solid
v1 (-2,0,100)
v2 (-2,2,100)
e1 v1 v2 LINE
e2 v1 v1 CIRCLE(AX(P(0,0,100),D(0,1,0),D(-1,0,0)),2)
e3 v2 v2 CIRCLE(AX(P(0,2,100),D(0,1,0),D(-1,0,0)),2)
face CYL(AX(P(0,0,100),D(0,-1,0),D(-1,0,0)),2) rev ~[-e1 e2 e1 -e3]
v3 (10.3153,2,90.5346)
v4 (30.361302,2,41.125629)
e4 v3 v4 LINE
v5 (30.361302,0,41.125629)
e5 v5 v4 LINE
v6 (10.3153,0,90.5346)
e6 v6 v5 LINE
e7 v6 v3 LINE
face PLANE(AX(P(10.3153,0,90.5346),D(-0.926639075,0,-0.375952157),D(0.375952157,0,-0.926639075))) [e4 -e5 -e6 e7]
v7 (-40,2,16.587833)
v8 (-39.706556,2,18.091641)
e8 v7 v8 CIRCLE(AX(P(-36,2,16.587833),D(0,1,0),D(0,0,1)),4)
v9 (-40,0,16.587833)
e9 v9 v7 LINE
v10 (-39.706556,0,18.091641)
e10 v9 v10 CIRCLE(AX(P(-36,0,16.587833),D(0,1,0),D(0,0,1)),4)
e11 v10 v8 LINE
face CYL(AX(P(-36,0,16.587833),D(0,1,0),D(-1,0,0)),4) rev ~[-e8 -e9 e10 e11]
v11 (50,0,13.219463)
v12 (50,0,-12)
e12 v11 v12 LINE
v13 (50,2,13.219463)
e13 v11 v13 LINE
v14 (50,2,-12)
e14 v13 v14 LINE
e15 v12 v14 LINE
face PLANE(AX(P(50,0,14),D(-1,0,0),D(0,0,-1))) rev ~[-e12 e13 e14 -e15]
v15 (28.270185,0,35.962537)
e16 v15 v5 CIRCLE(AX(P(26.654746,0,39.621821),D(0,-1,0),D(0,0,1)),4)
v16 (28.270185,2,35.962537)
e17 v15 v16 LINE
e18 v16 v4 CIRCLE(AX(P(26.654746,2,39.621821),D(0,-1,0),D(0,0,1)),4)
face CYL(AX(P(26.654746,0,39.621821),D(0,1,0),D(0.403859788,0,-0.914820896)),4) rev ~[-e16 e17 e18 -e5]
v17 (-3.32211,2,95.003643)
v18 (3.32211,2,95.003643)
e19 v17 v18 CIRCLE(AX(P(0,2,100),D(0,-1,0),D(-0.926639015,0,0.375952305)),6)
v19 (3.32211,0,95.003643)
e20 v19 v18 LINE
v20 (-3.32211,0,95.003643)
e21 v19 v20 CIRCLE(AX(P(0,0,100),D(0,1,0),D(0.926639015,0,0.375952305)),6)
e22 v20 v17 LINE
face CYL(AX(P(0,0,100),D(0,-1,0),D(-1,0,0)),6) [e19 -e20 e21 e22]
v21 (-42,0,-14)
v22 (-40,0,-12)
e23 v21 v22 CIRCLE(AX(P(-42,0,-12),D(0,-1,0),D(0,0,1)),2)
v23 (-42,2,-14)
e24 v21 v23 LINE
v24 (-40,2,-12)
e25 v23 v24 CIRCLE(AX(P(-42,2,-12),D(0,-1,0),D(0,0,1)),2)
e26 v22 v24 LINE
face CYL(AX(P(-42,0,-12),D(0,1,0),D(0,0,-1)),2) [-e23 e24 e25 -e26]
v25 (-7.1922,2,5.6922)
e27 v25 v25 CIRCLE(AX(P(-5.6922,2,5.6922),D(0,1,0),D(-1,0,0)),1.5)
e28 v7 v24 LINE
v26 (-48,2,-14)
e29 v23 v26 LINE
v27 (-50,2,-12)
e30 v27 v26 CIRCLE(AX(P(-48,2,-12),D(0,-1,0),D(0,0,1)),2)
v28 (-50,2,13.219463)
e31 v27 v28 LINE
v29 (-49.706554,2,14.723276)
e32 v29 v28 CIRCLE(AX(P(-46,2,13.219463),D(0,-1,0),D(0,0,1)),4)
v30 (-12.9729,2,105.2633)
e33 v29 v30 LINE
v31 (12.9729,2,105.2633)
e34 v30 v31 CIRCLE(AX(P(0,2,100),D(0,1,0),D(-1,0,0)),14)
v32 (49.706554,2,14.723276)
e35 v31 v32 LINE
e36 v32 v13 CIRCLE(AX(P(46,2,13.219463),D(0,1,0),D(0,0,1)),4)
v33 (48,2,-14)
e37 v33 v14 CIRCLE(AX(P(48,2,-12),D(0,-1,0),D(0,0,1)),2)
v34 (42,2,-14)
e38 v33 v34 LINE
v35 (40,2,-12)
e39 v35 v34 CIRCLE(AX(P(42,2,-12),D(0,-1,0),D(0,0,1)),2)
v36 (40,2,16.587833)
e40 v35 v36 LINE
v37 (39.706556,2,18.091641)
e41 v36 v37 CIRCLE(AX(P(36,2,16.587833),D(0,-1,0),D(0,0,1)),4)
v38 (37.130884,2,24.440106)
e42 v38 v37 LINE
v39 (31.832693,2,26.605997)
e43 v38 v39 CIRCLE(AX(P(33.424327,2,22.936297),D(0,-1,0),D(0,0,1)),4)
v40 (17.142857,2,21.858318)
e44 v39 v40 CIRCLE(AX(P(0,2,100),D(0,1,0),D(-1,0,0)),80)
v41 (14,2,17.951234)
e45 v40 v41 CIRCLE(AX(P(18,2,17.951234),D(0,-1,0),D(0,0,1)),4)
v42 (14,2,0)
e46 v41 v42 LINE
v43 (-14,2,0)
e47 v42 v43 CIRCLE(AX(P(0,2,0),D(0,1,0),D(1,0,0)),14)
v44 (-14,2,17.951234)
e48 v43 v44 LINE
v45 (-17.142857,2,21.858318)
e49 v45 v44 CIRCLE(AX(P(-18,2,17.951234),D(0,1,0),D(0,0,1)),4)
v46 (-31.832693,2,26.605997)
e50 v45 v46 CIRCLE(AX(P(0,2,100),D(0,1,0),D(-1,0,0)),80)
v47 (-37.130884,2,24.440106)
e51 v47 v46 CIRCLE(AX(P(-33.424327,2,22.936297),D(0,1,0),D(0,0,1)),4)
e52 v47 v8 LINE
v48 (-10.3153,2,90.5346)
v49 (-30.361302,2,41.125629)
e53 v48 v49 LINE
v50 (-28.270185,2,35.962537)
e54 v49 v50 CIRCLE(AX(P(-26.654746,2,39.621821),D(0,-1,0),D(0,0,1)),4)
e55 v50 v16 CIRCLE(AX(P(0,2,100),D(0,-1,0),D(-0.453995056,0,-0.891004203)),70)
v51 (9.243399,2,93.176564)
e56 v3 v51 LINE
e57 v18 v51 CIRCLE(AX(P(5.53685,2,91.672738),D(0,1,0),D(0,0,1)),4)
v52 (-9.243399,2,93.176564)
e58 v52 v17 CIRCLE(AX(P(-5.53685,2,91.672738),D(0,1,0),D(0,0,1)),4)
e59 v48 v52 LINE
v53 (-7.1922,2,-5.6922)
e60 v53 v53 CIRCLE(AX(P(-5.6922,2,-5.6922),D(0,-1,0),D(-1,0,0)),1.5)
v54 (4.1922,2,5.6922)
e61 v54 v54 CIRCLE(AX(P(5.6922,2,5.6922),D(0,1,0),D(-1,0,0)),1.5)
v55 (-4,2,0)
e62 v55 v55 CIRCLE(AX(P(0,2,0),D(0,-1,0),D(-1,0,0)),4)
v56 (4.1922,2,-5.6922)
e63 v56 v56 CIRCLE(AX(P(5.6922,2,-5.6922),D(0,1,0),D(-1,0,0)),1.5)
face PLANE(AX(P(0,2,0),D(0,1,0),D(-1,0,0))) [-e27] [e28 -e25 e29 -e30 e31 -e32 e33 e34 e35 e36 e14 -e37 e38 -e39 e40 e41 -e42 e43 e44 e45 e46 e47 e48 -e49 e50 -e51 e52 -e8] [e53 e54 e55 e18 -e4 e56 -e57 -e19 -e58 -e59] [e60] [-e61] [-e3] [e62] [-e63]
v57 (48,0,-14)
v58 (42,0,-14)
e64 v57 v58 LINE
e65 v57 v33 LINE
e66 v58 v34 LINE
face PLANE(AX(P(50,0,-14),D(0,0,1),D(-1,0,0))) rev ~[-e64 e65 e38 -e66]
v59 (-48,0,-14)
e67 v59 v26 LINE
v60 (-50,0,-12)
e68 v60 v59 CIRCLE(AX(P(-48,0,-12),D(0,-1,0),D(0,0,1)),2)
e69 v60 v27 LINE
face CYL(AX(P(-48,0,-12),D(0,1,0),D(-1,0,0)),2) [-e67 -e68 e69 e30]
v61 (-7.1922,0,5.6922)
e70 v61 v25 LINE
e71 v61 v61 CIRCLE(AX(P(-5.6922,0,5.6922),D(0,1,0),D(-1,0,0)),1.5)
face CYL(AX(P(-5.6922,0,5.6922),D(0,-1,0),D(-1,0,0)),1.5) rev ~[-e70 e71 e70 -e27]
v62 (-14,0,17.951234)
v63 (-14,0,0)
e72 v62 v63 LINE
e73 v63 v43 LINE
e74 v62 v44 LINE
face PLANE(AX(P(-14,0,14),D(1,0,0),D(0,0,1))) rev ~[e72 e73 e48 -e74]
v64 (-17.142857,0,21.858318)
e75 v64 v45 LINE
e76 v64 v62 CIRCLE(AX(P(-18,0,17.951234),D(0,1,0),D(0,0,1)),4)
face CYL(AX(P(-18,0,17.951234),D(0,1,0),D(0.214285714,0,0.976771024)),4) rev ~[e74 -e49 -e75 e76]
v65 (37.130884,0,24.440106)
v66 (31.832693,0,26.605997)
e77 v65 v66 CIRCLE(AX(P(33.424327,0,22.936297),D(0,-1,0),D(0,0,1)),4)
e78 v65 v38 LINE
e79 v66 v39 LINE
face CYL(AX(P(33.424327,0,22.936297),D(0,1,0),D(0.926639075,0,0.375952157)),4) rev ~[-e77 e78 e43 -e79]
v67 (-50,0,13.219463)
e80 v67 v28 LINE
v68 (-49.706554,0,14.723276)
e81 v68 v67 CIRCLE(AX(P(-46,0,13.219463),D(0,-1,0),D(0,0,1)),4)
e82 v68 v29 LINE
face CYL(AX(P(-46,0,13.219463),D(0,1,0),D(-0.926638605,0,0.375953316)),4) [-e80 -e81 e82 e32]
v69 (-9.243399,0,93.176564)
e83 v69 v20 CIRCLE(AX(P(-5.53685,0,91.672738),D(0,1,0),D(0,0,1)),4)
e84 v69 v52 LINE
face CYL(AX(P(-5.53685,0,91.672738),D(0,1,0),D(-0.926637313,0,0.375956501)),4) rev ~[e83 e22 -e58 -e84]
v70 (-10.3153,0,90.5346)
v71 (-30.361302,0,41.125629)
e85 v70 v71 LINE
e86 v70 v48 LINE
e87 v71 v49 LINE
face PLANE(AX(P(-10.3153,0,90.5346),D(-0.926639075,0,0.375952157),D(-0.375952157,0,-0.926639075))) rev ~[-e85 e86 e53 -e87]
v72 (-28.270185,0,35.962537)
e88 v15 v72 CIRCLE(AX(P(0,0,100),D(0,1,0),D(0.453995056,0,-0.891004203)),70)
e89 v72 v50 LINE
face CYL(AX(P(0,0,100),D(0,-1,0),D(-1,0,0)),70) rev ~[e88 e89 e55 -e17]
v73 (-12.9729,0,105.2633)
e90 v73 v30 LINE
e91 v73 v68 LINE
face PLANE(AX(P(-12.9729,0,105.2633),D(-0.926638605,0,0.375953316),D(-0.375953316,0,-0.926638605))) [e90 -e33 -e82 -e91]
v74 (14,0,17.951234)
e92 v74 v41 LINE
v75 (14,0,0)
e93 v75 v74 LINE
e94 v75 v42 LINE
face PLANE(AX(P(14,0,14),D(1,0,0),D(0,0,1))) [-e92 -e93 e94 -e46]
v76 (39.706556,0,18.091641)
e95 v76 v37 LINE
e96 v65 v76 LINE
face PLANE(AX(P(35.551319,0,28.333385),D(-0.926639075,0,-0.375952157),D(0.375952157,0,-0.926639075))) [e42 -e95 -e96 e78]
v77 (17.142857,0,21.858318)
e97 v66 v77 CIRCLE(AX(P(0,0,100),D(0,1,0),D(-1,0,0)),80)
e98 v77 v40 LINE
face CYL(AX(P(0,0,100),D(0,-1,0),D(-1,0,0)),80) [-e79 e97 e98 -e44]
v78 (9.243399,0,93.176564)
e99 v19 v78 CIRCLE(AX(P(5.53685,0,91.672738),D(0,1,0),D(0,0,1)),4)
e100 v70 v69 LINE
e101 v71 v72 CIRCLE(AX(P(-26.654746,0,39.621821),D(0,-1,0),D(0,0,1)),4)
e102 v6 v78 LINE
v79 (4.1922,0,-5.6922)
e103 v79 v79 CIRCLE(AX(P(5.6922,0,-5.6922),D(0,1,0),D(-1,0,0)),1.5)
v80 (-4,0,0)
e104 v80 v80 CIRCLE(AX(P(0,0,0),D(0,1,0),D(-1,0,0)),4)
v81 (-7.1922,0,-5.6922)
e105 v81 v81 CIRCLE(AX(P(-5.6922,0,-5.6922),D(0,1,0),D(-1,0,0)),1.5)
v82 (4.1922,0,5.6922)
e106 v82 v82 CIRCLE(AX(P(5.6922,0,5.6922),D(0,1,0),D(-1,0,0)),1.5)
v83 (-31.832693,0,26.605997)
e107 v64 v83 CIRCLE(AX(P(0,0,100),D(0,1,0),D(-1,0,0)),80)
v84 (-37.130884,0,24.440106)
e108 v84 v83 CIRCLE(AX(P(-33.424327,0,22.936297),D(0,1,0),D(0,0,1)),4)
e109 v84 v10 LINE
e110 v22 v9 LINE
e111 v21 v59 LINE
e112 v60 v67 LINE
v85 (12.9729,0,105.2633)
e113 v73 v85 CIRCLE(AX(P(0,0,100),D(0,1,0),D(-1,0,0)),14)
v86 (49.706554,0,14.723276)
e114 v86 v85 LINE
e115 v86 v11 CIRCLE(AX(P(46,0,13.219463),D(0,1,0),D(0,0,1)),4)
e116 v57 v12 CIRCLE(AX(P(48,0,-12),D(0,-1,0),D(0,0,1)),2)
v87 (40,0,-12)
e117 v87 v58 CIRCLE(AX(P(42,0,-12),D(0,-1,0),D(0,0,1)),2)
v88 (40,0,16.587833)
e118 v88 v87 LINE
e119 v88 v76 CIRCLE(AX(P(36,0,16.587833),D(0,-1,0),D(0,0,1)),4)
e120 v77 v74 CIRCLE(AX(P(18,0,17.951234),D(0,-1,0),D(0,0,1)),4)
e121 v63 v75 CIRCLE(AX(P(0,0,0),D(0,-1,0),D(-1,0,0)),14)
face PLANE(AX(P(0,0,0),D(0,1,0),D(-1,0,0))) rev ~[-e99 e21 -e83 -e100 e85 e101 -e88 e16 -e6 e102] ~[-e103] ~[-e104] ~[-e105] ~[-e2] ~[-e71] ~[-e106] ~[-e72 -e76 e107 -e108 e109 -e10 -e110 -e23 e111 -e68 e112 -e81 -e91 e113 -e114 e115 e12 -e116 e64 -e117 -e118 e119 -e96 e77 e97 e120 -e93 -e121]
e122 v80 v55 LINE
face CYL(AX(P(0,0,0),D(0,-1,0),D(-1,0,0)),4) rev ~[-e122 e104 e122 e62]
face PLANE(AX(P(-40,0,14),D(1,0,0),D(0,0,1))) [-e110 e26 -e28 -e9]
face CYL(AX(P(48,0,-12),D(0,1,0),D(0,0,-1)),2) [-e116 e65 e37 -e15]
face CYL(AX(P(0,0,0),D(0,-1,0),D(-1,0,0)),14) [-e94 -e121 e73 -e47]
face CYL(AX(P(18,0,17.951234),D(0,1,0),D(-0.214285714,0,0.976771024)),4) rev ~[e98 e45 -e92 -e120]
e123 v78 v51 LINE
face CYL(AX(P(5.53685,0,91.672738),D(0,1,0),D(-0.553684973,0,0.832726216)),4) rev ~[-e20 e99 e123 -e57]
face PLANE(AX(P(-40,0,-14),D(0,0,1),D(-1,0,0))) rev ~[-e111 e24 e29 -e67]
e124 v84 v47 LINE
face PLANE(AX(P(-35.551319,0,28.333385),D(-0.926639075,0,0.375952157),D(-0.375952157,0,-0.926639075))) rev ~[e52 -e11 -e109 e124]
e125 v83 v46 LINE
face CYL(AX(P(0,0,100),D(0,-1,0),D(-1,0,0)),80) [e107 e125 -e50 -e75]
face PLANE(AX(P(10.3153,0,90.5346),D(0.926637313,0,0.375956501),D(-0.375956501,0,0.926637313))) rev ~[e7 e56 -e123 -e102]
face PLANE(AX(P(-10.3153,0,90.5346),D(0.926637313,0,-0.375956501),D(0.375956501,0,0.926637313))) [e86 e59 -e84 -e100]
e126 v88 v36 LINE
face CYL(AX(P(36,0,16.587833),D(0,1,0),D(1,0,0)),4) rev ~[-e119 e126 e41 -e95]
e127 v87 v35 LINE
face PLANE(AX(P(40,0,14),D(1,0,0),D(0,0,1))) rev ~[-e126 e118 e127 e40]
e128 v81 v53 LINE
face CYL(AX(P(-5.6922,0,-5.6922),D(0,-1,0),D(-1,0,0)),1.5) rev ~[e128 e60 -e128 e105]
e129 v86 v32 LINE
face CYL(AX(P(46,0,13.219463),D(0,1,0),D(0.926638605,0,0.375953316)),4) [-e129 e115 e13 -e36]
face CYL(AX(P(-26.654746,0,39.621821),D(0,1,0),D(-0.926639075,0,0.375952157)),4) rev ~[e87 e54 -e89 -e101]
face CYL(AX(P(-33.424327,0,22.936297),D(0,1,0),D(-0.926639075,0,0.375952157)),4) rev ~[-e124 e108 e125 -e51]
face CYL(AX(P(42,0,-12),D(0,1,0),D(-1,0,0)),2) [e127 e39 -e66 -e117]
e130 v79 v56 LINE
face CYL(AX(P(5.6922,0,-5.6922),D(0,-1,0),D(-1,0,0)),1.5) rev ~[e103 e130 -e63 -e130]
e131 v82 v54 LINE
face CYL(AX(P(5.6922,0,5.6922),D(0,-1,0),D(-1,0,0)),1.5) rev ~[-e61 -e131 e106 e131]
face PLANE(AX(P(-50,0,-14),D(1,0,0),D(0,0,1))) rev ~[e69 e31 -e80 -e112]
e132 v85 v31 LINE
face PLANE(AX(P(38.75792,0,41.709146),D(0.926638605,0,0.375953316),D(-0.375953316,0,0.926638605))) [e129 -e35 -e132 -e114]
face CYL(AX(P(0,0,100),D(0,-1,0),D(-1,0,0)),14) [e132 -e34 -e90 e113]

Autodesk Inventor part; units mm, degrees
ref_plane "YZ Plane" through (0, 0, 0) normal (1, 0, 0) x (0, 1, 0)
ref_plane "XZ Plane" through (0, 0, 0) normal (0, 1, 0) x (-1, 0, 0)
ref_plane "XY Plane" through (0, 0, 0) normal (0, 0, 1) x (1, 0, 0)
sketch "Sketch1" plane through (0, 0, 0) normal (0, 1, 0) x (-1, 0, 0)
  line L0 (0, 0) -> (5.6922, -5.6922)
  line L1 (0, 0) -> (8.05, 0) construction
  circle A0 centre (5.6922, -5.6922) radius 1.5
  circle A1 centre (5.6922, 5.6922) radius 1.5
  circle A2 centre (-5.6922, 5.6922) radius 1.5
  circle A3 centre (-5.6922, -5.6922) radius 1.5
  circle A4 centre (0, 100) radius 14
  circle A5 centre (0, 100) radius 2
  line L2 (-50, -14) -> (50, -14)
  line L3 (50, -14) -> (50, 14)
  line L4 (50, 14) -> (-50, 14)
  line L5 (-50, 14) -> (-50, -14)
  line L6 (-50, -14) -> (50, 14) construction
  line L7 (50, -14) -> (-50, 14) construction
  circle A6 centre (0, 0) radius 14
  line L8 (-50, 14) -> (-12.9729, 105.2633)
  line L9 (12.9729, 105.2633) -> (50, 14)
  line L10 (10.3153, 90.5346) -> (41.3666, 14)
  line L11 (-10.3153, 90.5346) -> (-41.3666, 14)
  line L12 (0, 86) -> (0, 14)
  circle A7 centre (0, 100) radius 6
  line L13 (-10.3153, 90.5346) -> (-5.5598, 102.2557)
  line L14 (10.3153, 90.5346) -> (5.5598, 102.2557)
  line L15 (-40, 14) -> (-40, -14)
  line L16 (40, 13) -> (40, -14)
  circle A8 centre (0, 0) radius 4
  circle A9 centre (0, 100) radius 70
  circle A10 centre (0, 100) radius 80
  line L17 (-40, 14) -> (-40, 30.718)
  line L18 (-14, 0) -> (-14, 21.2345)
  line L19 (14, 0) -> (14, 21.2345)
  line L20 (40, 13) -> (40, 30.718)
  line L21 (41.3666, 14) -> (40, 12.0487)
  line L22 (-41.3666, 14) -> (-40, 17.3685)
  point P0 (4, 86.5836)
  point P1 (2.5, 14)
  point P2 (-4, 86.5836)
  point P3 (4, 95.5279)
  point P4 (-4, 95.5279)
  point P5 (4.6667, 30.1557)
  point P6 (-4.6667, 30.1557)
  point P7 (31.7797, 37.6297)
  point P8 (-31.7797, 37.6297)
  point P9 (-42.585, 32.2762)
  point P10 (-14, 14)
  point P11 (14, 14)
  point P12 (42.585, 32.2762)
  point P13 (40, 14)
  point P14 (40, 38.6477)
  point P15 (0, 14)
  point P16 (-40, 38.6477)
  point P17 (-40, 17.3685)
  point P18 (-35.5513, 28.3334)
  point P19 (40, 17.3685)
  point P20 (35.5513, 28.3334)
  dimension "d7" = 28
  dimension "d0" = 8.05
  dimension "d1" = 45
  dimension "d2" = 3
  dimension "d5" = 360
  dimension "d9" = 4
  dimension "d10" = 100
  dimension "d11" = 28
  dimension "d12" = 28
  dimension "d13" = 8
  dimension "d14" = 8
  dimension "d20" = 10
  dimension "d22" = 10
  dimension "d24" = 8
  dimension "d26" = 140
  dimension "d29" = 10
  dimension "d30" = 100
extrude "Extrusion1" add sketch "Sketch1" along normal blind 2 contours A4 L14 A7 L13 | A4 L9 A9 L10 | A4 L11 A9 L8 | L9 A10 L10 A9 | L10 A10 L12 A9 | A7 | A9 L11 A10 L8 | L9 L4 L10 L20 A10 | L12 A10 L11 A9 | A10 L20 L10 | A10 L17 L11 L4 L8 | L3 L2 L16 L21 L4 | A10 L19 L4 L12 | L12 L4 L18 A10 | L10 L4 L20 | L11 L17 A10 | L4 L15 L2 L5 | L21 L16 L20 L4 | A6 L18 L4 | L4 L19 A6 | A6 | L17 L4 L11 picked at (9.3983, 95.3801)
fillet "Fillet1" radius 4 6 edges at (5.5598, 1, 102.2557) (-5.5598, 1, 102.2557) (50, 1, 14) (-50, 1, 14) (-31.7797, 1, 37.6297) (31.7797, 1, 37.6297)
fillet "Fillet2" radius 4 6 edges at (14, 1, 21.2345) (-14, 1, 21.2345) (35.5513, 1, 28.3334) (40, 1, 17.3685) (-35.5513, 1, 28.3334) (-40, 1, 17.3685)
fillet "Fillet3" radius 2 4 edges at (-40, 1, -14) (50, 1, -14) (40, 1, -14) (-50, 1, -14)
equation "\"d14\" = d13"
equation "\"d20\" = d22"
properties part number "frame_rotor" material "Aluminum 6061"
